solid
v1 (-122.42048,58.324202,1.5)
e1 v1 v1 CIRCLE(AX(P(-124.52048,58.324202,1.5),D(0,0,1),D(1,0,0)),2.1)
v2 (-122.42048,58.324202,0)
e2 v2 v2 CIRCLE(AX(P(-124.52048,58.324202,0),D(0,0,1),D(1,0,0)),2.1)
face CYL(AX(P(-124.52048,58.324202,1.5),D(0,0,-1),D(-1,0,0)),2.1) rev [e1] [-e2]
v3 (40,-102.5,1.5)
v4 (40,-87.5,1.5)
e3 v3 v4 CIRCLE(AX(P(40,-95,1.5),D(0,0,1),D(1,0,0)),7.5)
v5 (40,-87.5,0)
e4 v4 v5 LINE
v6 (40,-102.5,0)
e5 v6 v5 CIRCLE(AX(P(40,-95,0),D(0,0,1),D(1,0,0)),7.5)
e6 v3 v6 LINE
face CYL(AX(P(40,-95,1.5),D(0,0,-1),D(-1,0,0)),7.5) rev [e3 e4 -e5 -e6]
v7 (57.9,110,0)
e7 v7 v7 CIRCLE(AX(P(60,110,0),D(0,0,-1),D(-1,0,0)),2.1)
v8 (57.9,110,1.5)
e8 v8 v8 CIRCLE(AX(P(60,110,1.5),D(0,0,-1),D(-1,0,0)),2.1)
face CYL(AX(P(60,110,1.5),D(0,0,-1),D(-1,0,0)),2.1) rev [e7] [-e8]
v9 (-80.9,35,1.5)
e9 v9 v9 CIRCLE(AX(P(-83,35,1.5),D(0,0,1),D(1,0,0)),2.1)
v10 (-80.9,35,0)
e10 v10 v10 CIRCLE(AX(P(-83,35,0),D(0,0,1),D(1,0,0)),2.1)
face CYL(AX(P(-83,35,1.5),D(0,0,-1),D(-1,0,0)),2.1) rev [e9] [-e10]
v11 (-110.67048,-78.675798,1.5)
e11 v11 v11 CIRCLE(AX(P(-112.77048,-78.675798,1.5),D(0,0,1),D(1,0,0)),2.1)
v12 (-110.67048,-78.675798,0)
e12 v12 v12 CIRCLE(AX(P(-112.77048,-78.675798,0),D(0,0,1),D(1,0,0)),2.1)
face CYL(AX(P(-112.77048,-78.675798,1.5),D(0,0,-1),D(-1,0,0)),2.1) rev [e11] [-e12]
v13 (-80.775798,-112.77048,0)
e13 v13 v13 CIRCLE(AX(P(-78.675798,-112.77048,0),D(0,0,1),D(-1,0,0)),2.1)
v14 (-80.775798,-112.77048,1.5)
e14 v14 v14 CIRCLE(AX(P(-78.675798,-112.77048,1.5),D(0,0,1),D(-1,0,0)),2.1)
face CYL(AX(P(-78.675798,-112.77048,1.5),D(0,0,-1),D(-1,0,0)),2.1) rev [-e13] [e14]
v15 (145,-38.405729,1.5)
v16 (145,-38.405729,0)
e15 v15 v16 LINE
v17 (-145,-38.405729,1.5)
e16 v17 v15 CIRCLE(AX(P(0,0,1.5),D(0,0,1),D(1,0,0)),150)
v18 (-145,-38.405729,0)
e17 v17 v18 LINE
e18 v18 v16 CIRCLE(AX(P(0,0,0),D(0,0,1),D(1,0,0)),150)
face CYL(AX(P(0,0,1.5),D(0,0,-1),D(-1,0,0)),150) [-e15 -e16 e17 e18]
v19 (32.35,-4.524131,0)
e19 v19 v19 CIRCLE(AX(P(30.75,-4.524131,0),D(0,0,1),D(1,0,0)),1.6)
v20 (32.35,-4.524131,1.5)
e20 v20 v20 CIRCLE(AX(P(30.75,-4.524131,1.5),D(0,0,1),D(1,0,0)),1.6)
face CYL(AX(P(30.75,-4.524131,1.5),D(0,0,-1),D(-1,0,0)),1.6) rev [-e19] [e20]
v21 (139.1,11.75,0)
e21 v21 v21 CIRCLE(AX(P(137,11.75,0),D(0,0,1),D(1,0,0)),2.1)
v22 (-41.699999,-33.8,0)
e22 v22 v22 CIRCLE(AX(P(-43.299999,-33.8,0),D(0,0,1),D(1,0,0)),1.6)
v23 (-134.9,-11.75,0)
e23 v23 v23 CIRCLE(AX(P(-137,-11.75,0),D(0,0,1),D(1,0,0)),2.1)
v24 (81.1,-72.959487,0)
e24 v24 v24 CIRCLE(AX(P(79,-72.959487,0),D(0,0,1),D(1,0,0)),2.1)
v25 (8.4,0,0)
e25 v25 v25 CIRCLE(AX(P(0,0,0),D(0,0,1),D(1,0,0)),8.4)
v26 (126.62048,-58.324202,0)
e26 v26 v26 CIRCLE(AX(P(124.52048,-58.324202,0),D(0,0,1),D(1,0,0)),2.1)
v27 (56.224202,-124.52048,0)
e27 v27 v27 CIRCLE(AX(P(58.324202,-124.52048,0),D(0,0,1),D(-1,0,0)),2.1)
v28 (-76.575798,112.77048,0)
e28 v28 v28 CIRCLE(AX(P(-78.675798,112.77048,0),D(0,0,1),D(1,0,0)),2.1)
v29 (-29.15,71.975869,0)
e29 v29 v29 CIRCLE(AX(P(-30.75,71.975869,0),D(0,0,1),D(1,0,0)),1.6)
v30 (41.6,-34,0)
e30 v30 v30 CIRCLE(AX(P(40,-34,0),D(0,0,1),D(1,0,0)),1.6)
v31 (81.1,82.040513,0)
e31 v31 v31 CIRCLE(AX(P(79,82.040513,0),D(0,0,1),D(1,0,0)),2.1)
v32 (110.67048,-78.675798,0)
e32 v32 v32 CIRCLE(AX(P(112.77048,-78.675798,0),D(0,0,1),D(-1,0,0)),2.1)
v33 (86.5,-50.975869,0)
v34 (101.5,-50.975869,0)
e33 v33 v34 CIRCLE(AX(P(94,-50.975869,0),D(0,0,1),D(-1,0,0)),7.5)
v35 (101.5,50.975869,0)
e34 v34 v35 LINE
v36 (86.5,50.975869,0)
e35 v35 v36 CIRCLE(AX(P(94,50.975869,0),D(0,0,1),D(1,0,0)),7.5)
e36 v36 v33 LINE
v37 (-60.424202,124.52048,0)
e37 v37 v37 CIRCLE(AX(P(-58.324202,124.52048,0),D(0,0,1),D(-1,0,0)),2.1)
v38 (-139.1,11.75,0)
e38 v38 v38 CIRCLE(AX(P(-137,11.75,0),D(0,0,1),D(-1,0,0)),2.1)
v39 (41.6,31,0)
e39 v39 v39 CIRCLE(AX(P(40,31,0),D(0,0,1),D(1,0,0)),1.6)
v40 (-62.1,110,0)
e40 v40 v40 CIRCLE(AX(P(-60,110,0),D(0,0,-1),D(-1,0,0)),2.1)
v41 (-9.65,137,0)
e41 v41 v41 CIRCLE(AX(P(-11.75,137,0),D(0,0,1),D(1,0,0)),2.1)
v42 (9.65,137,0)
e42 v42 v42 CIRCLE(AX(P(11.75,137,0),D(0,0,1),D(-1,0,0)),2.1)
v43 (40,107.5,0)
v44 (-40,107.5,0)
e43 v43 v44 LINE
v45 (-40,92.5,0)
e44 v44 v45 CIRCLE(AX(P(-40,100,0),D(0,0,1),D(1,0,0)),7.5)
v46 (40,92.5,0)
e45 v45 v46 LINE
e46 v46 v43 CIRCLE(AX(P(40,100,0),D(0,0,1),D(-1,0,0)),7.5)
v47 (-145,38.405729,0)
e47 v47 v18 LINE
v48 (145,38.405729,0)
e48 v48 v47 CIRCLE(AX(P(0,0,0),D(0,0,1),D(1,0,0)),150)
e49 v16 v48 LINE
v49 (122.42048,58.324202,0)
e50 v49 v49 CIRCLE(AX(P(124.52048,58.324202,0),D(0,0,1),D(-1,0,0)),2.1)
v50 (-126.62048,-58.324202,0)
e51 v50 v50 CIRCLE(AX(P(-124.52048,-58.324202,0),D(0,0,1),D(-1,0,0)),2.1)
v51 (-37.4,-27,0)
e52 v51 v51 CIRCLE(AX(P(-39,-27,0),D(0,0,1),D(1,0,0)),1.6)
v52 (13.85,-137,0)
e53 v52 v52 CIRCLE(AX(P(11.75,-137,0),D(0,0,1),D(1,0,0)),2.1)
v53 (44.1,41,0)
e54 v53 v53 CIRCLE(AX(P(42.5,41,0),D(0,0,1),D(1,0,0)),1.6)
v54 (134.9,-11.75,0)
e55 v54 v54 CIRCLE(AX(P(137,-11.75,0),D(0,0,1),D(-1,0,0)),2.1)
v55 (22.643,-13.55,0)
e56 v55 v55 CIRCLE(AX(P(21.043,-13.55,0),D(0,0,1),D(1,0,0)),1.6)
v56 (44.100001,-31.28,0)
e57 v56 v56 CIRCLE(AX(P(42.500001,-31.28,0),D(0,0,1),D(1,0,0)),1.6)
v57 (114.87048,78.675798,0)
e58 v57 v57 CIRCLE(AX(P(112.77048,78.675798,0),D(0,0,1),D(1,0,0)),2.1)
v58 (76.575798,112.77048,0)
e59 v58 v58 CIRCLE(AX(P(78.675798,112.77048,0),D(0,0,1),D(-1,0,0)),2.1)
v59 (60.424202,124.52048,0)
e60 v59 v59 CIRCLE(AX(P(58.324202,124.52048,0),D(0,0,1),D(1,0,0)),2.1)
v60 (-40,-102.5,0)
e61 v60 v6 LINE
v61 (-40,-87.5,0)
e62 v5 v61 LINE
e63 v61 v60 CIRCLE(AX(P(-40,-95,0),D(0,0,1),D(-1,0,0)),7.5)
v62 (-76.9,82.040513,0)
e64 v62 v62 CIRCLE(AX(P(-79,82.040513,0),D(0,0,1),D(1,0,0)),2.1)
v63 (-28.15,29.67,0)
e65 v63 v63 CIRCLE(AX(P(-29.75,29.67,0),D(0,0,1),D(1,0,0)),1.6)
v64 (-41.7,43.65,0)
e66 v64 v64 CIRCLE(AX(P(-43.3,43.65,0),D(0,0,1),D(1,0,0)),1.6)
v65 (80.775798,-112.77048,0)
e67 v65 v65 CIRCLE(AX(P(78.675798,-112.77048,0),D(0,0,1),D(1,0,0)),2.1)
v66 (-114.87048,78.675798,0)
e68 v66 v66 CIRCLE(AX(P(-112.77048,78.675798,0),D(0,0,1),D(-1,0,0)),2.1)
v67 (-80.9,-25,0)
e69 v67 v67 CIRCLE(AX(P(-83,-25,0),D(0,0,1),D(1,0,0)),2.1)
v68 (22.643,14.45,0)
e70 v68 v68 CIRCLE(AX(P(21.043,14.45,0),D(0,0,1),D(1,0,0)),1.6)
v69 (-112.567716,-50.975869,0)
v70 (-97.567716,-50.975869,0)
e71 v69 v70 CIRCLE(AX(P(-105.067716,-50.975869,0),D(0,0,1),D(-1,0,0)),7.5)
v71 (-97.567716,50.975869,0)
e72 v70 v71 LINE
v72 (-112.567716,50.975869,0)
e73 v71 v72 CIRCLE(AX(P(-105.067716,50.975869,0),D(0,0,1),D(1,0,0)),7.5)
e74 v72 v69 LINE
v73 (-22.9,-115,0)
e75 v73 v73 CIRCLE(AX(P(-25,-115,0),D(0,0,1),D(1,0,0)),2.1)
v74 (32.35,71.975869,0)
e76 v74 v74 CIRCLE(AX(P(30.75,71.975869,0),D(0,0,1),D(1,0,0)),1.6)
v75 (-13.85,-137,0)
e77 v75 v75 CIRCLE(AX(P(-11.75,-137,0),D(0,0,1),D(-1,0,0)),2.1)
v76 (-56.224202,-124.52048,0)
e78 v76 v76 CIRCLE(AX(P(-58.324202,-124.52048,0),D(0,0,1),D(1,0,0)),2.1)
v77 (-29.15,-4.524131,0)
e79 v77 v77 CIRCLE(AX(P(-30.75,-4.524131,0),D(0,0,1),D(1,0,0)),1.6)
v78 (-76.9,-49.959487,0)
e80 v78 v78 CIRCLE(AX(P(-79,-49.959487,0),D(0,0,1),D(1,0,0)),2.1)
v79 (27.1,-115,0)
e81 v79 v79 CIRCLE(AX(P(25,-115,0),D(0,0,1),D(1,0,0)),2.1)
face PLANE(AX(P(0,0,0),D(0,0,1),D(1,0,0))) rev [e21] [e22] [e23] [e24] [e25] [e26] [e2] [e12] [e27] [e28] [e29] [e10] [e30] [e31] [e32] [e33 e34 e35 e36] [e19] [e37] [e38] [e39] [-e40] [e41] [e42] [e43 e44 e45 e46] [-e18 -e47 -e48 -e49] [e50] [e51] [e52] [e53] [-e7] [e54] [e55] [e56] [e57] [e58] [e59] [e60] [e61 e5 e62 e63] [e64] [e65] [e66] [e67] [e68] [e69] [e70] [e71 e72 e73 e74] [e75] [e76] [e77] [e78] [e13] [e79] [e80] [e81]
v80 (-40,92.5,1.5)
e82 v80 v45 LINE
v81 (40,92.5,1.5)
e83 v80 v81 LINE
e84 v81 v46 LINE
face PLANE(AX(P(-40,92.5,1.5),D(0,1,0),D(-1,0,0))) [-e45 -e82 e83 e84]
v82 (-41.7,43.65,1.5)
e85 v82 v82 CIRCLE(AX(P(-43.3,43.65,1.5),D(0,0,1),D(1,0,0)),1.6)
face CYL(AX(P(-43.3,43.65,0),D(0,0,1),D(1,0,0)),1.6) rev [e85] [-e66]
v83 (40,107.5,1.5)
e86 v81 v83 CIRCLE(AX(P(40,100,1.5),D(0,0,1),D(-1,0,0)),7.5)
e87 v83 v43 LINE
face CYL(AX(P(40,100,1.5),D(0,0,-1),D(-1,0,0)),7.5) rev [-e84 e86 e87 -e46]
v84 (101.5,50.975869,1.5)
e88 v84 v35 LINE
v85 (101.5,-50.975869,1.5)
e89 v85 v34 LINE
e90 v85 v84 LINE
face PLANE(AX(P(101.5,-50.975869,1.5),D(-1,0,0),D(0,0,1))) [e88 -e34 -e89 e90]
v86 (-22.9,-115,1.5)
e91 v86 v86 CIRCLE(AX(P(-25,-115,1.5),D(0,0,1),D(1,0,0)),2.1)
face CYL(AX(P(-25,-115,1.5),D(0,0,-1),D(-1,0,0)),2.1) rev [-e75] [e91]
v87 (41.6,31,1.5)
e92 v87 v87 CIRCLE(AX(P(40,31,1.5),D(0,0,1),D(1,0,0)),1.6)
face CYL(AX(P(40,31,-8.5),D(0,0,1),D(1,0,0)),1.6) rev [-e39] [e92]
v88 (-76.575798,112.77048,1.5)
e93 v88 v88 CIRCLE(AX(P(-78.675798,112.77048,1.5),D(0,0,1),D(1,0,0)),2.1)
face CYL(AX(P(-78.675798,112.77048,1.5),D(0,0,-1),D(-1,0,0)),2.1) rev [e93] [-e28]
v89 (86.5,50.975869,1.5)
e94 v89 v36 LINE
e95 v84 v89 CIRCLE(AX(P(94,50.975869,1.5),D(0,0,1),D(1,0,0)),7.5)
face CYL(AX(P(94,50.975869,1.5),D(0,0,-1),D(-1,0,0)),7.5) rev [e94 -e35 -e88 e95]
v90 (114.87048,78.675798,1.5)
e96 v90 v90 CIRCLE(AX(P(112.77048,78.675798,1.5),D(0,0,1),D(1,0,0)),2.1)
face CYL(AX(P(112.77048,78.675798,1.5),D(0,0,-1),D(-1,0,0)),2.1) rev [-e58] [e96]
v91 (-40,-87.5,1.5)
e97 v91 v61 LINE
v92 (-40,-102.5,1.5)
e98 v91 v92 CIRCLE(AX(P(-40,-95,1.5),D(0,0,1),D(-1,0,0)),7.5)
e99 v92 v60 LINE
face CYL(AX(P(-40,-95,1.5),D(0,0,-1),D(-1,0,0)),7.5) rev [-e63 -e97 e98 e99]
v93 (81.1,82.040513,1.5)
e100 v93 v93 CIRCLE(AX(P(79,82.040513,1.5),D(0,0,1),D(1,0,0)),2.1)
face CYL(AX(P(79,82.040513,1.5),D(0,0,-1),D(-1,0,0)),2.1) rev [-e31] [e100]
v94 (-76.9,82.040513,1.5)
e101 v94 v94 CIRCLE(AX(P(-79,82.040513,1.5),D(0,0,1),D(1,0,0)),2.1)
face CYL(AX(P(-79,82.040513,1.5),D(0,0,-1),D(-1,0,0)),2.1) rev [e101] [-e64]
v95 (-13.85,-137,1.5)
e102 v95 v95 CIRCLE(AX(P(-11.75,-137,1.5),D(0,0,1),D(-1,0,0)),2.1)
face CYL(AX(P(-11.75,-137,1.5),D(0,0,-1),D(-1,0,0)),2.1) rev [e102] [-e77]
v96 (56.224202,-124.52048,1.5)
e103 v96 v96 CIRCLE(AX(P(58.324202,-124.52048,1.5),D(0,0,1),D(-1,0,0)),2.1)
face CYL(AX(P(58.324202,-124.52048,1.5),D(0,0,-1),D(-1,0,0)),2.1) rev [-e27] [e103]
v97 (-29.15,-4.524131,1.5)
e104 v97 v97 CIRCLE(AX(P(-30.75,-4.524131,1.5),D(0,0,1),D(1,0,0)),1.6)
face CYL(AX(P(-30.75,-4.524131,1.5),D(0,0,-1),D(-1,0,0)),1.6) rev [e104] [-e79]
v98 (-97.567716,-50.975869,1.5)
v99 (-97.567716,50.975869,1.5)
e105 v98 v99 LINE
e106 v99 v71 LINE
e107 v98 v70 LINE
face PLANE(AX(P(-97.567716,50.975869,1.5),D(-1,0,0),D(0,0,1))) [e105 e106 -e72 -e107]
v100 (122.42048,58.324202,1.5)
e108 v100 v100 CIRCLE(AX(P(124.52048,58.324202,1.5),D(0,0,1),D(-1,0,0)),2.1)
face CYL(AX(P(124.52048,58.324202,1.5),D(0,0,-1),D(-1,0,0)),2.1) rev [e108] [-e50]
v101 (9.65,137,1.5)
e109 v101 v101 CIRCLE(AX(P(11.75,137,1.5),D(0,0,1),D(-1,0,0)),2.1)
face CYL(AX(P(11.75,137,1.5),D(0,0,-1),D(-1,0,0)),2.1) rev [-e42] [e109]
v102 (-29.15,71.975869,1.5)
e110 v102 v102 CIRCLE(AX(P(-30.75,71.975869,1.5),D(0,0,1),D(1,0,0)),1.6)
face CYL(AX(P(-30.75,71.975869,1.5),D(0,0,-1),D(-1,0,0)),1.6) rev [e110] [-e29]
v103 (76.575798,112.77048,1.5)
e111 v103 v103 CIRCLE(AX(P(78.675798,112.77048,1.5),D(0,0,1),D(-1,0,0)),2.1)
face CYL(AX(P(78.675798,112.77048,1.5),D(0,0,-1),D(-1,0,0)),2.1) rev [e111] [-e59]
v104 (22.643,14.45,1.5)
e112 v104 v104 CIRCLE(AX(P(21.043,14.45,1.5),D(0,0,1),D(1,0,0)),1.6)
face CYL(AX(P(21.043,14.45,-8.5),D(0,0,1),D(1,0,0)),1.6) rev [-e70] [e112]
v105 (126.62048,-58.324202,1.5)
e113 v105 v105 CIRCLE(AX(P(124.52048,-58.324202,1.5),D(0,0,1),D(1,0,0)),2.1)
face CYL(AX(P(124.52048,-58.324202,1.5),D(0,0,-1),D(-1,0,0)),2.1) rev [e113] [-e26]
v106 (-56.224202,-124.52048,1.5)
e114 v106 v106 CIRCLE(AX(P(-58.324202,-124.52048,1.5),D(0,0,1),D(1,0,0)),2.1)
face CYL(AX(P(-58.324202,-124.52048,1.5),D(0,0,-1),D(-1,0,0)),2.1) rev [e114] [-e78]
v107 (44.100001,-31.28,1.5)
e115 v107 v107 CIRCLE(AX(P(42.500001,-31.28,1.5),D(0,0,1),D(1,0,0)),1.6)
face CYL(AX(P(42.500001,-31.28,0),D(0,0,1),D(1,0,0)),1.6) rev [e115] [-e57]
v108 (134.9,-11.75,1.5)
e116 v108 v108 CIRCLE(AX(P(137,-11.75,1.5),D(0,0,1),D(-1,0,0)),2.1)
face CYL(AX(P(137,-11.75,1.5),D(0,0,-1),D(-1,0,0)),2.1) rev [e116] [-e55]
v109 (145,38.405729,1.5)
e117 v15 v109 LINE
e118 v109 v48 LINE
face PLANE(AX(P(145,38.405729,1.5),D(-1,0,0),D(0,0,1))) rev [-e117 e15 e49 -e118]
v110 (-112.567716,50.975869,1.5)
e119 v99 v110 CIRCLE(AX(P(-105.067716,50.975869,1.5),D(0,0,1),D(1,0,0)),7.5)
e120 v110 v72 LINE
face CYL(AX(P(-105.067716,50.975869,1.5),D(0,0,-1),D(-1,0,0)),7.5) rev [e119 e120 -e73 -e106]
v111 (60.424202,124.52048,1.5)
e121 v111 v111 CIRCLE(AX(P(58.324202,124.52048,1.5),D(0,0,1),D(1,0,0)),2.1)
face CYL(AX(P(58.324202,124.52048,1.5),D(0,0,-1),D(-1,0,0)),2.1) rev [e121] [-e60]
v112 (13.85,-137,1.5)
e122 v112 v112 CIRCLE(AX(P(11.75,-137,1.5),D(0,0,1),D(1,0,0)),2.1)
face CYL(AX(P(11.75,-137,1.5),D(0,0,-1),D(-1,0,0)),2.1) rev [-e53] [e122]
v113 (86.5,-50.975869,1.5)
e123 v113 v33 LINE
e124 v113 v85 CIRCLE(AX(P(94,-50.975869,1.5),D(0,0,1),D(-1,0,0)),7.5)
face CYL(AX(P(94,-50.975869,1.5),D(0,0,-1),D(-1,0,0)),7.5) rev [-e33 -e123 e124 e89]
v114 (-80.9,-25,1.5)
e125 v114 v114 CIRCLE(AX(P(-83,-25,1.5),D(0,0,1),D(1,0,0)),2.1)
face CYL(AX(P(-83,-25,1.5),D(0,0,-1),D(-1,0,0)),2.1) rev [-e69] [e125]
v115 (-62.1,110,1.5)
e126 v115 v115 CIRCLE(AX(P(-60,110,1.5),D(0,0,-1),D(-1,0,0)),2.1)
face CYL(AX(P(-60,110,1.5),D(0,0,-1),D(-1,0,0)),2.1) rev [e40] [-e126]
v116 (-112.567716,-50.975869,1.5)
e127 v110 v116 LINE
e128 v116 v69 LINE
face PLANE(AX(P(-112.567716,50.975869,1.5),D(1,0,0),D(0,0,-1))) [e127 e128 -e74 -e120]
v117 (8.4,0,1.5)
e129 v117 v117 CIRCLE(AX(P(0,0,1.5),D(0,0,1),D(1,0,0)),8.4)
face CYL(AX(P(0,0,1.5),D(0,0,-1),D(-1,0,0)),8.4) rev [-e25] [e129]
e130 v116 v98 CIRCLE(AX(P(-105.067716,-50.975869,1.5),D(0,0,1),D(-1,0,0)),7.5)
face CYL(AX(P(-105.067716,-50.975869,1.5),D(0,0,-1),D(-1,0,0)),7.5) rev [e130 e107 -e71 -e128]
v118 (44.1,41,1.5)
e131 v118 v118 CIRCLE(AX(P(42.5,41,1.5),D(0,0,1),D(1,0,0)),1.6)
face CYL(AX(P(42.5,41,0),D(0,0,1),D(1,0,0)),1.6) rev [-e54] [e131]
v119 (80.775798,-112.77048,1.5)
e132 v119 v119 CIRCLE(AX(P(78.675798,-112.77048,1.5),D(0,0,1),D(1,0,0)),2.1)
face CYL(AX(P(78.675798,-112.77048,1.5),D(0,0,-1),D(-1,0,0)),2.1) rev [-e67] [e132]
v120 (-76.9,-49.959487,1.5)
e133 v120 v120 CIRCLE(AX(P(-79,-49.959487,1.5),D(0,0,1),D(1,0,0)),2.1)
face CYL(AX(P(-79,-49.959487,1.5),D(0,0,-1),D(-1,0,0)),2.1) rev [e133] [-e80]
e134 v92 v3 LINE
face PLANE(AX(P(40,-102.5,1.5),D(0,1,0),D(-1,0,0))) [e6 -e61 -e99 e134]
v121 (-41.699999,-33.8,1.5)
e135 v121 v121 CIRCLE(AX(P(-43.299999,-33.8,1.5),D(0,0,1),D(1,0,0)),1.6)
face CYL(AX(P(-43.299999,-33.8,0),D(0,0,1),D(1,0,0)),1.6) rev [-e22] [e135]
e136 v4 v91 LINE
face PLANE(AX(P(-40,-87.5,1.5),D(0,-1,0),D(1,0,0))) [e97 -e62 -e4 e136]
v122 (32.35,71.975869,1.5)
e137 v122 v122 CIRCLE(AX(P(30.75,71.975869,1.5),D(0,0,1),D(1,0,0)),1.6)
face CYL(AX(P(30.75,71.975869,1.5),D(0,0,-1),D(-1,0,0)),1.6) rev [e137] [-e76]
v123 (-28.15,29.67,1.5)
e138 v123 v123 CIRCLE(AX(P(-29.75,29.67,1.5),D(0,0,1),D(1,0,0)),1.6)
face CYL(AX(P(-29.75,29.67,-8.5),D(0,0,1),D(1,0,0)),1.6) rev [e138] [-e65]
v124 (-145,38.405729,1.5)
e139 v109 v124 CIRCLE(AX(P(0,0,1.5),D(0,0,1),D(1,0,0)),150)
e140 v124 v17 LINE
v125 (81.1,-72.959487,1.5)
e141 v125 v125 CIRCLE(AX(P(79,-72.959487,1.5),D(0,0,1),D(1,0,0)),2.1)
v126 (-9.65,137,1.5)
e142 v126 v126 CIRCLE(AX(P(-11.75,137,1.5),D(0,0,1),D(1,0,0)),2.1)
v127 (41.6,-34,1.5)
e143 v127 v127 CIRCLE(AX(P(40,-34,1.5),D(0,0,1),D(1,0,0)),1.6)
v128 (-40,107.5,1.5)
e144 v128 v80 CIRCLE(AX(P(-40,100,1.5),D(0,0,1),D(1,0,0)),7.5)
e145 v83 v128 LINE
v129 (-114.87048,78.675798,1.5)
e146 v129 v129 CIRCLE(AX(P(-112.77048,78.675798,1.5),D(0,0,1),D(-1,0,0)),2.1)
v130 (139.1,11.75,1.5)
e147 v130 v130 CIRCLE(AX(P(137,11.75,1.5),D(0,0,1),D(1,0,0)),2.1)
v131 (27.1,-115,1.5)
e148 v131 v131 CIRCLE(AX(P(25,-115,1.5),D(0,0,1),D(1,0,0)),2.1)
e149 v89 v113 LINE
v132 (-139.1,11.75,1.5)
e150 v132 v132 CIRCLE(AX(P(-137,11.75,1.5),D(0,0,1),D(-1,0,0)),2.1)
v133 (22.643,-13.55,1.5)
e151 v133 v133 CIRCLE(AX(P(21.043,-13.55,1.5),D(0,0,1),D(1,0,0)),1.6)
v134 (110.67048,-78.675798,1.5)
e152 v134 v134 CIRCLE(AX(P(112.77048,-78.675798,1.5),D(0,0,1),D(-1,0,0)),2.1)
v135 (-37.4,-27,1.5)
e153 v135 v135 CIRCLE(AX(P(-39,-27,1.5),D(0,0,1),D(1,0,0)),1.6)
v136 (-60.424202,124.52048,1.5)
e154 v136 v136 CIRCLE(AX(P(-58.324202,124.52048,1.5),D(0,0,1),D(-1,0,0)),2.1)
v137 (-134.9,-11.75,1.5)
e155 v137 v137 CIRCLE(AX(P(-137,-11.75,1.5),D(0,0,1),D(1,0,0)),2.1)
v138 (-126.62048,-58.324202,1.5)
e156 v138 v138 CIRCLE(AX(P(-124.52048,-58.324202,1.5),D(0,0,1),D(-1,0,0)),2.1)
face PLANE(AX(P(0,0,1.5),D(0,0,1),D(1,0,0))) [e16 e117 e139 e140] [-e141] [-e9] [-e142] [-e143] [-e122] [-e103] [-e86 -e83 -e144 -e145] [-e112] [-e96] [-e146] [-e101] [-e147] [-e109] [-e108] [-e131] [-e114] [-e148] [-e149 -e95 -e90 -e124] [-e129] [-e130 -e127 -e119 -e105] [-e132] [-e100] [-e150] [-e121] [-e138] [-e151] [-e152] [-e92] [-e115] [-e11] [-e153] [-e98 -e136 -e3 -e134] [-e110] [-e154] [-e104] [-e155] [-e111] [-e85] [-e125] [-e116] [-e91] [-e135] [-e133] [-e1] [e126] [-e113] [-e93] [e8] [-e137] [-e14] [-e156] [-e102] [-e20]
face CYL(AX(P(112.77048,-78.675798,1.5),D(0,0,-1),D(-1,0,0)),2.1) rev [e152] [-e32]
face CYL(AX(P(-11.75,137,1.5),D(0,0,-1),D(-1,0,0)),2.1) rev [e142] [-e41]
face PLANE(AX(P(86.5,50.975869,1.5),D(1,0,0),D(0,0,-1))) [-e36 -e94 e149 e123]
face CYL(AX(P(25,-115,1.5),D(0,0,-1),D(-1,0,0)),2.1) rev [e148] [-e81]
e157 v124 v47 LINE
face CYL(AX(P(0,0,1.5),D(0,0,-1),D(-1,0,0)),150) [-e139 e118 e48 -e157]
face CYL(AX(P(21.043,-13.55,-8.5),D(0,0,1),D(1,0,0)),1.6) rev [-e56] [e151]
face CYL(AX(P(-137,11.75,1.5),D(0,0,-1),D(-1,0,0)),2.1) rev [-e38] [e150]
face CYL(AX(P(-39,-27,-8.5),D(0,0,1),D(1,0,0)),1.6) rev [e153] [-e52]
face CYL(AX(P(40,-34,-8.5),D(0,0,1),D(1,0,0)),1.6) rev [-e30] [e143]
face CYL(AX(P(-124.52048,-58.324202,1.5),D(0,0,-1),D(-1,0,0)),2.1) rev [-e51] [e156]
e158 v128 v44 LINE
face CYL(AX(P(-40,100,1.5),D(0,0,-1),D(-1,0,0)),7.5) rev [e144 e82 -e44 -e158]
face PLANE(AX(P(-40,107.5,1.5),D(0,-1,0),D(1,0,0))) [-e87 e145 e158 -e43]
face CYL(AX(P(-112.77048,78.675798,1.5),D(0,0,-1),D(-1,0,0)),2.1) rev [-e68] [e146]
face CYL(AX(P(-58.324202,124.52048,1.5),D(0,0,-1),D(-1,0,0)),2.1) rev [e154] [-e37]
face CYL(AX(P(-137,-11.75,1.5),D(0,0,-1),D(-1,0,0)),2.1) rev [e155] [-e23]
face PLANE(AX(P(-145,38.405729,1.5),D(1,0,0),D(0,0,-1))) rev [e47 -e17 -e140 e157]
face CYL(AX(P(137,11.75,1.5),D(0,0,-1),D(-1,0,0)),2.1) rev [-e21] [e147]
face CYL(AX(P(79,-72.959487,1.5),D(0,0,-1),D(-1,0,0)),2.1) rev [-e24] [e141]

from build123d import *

# Parameters (mm, degrees)
SM_BASE_FLANGE_1_OUTLINE_R   = 2.1
SM_BASE_FLANGE_1_OUTLINE_R_2 = 1.6
SM_BASE_FLANGE_1_OUTLINE_R_3 = 8.4
SM_BASE_FLANGE_1_DEPTH       = 1.5
SKETCH_2_R                   = 1.6
CUT_EXTRUDE_1_DEPTH          = 10
SKETCH_4_R                   = 2.1
CUT_EXTRUDE_2_DEPTH          = 1.5
SKETCH_6_R                   = 1.6
CUT_EXTRUDE_4_DEPTH          = 1.5


# Read off the part's stored shape, not the designer's step: 基体-法兰1
with BuildPart() as part:
    # 基体-法兰1 outline → 基体-法兰1 (new body)
    with BuildSketch(Plane.XY):
        with BuildLine():
            ThreePointArc((-145, -38.405728739), (0, -150), (145, -38.405728739))
            Line((145, -38.405728739), (145, 38.405728739))
            ThreePointArc((145, 38.405728739), (0, 150), (-145, 38.405728739))
            Line((-145, 38.405728739), (-145, -38.405728739))
        make_face()
        with Locations((-78.675798494, -112.770480318)):
            Circle(SM_BASE_FLANGE_1_OUTLINE_R, mode=Mode.SUBTRACT)
        with Locations((-112.770480318, -78.675798494)):
            Circle(SM_BASE_FLANGE_1_OUTLINE_R, mode=Mode.SUBTRACT)
        with Locations((-58.324201506, -124.520480318)):
            Circle(SM_BASE_FLANGE_1_OUTLINE_R, mode=Mode.SUBTRACT)
        with Locations((-11.75, -137)):
            Circle(SM_BASE_FLANGE_1_OUTLINE_R, mode=Mode.SUBTRACT)
        with Locations((-25, -115)):
            Circle(SM_BASE_FLANGE_1_OUTLINE_R, mode=Mode.SUBTRACT)
        with Locations((-124.520480318, -58.324201506)):
            Circle(SM_BASE_FLANGE_1_OUTLINE_R, mode=Mode.SUBTRACT)
        with Locations((-79, -49.959487412)):
            Circle(SM_BASE_FLANGE_1_OUTLINE_R, mode=Mode.SUBTRACT)
        with Locations((-137, -11.75)):
            Circle(SM_BASE_FLANGE_1_OUTLINE_R, mode=Mode.SUBTRACT)
        with Locations((-83, -25)):
            Circle(SM_BASE_FLANGE_1_OUTLINE_R, mode=Mode.SUBTRACT)
        with Locations((-30.75, -4.524131076)):
            Circle(SM_BASE_FLANGE_1_OUTLINE_R_2, mode=Mode.SUBTRACT)
        with Locations((11.75, -137)):
            Circle(SM_BASE_FLANGE_1_OUTLINE_R, mode=Mode.SUBTRACT)
        with Locations((25, -115)):
            Circle(SM_BASE_FLANGE_1_OUTLINE_R, mode=Mode.SUBTRACT)
        with Locations((58.324201506, -124.520480318)):
            Circle(SM_BASE_FLANGE_1_OUTLINE_R, mode=Mode.SUBTRACT)
        with BuildLine():
            Line((40, -102.5), (-40, -102.5))
            ThreePointArc((-40, -102.5), (-47.5, -95), (-40, -87.5))
            Line((-40, -87.5), (40, -87.5))
            ThreePointArc((40, -87.5), (47.5, -95), (40, -102.5))
        make_face(mode=Mode.SUBTRACT)
        with Locations((78.675798494, -112.770480318)):
            Circle(SM_BASE_FLANGE_1_OUTLINE_R, mode=Mode.SUBTRACT)
        with Locations((112.770480318, -78.675798494)):
            Circle(SM_BASE_FLANGE_1_OUTLINE_R, mode=Mode.SUBTRACT)
        with Locations((30.75, -4.524131076)):
            Circle(SM_BASE_FLANGE_1_OUTLINE_R_2, mode=Mode.SUBTRACT)
        with Locations((79, -72.959487412)):
            Circle(SM_BASE_FLANGE_1_OUTLINE_R, mode=Mode.SUBTRACT)
        with Locations((124.520480318, -58.324201506)):
            Circle(SM_BASE_FLANGE_1_OUTLINE_R, mode=Mode.SUBTRACT)
        with Locations((137, -11.75)):
            Circle(SM_BASE_FLANGE_1_OUTLINE_R, mode=Mode.SUBTRACT)
        with Locations((-137, 11.75)):
            Circle(SM_BASE_FLANGE_1_OUTLINE_R, mode=Mode.SUBTRACT)
        with BuildLine():
            Line((-112.567715637, -50.975868924), (-112.567715637, 50.975868924))
            ThreePointArc((-112.567715637, 50.975868924), (-105.067715637, 58.475868924), (-97.567715637, 50.975868924))
            Line((-97.567715637, 50.975868924), (-97.567715637, -50.975868924))
            ThreePointArc((-97.567715637, -50.975868924), (-105.067715637, -58.475868924), (-112.567715637, -50.975868924))
        make_face(mode=Mode.SUBTRACT)
        with Locations((-83, 35)):
            Circle(SM_BASE_FLANGE_1_OUTLINE_R, mode=Mode.SUBTRACT)
        with Locations((-124.520480318, 58.324201506)):
            Circle(SM_BASE_FLANGE_1_OUTLINE_R, mode=Mode.SUBTRACT)
        with Locations((-30.75, 71.975868924)):
            Circle(SM_BASE_FLANGE_1_OUTLINE_R_2, mode=Mode.SUBTRACT)
        with Locations((-112.770480318, 78.675798494)):
            Circle(SM_BASE_FLANGE_1_OUTLINE_R, mode=Mode.SUBTRACT)
        with Locations((-79, 82.040512588)):
            Circle(SM_BASE_FLANGE_1_OUTLINE_R, mode=Mode.SUBTRACT)
        with Locations((-78.675798494, 112.770480318)):
            Circle(SM_BASE_FLANGE_1_OUTLINE_R, mode=Mode.SUBTRACT)
        with Locations((-58.324201506, 124.520480318)):
            Circle(SM_BASE_FLANGE_1_OUTLINE_R, mode=Mode.SUBTRACT)
        with Locations((-11.75, 137)):
            Circle(SM_BASE_FLANGE_1_OUTLINE_R, mode=Mode.SUBTRACT)
        Circle(SM_BASE_FLANGE_1_OUTLINE_R_3, mode=Mode.SUBTRACT)
        with Locations((30.75, 71.975868924)):
            Circle(SM_BASE_FLANGE_1_OUTLINE_R_2, mode=Mode.SUBTRACT)
        with BuildLine():
            Line((86.5, -50.975868924), (86.5, 50.975868924))
            ThreePointArc((86.5, 50.975868924), (94, 58.475868924), (101.5, 50.975868924))
            Line((101.5, 50.975868924), (101.5, -50.975868924))
            ThreePointArc((101.5, -50.975868924), (94, -58.475868924), (86.5, -50.975868924))
        make_face(mode=Mode.SUBTRACT)
        with Locations((137, 11.75)):
            Circle(SM_BASE_FLANGE_1_OUTLINE_R, mode=Mode.SUBTRACT)
        with Locations((124.520480318, 58.324201506)):
            Circle(SM_BASE_FLANGE_1_OUTLINE_R, mode=Mode.SUBTRACT)
        with BuildLine():
            Line((40, 92.5), (-40, 92.5))
            ThreePointArc((-40, 92.5), (-47.5, 100), (-40, 107.5))
            Line((-40, 107.5), (40, 107.5))
            ThreePointArc((40, 107.5), (47.5, 100), (40, 92.5))
        make_face(mode=Mode.SUBTRACT)
        with Locations((11.75, 137)):
            Circle(SM_BASE_FLANGE_1_OUTLINE_R, mode=Mode.SUBTRACT)
        with Locations((58.324201506, 124.520480318)):
            Circle(SM_BASE_FLANGE_1_OUTLINE_R, mode=Mode.SUBTRACT)
        with Locations((79, 82.040512588)):
            Circle(SM_BASE_FLANGE_1_OUTLINE_R, mode=Mode.SUBTRACT)
        with Locations((112.770480318, 78.675798494)):
            Circle(SM_BASE_FLANGE_1_OUTLINE_R, mode=Mode.SUBTRACT)
        with Locations((78.675798494, 112.770480318)):
            Circle(SM_BASE_FLANGE_1_OUTLINE_R, mode=Mode.SUBTRACT)
    extrude(amount=SM_BASE_FLANGE_1_DEPTH)

    # 草图2 → 切除-拉伸1 (cut)
    with BuildSketch(Plane.XY.offset(1.5)):
        with Locations((40, -34)):
            Circle(SKETCH_2_R)
        with Locations((40, 31)):
            Circle(SKETCH_2_R)
        with Locations((21.043, -13.55)):
            Circle(SKETCH_2_R)
        with Locations((-39, -27)):
            Circle(SKETCH_2_R)
        with Locations((-29.75, 29.67)):
            Circle(SKETCH_2_R)
        with Locations((21.043, 14.45)):
            Circle(SKETCH_2_R)
    extrude(amount=-CUT_EXTRUDE_1_DEPTH, mode=Mode.SUBTRACT)

    # 草图4 → 切除-拉伸2 (cut)
    with BuildSketch(Plane(origin=(0, 0, 0), x_dir=(-1, 0, 0), z_dir=(0, 0, -1))):
        with Locations((-60, 110)):
            Circle(SKETCH_4_R)
        with Locations((60, 110)):
            Circle(SKETCH_4_R)
    extrude(amount=-CUT_EXTRUDE_2_DEPTH, mode=Mode.SUBTRACT)

    # 草图6 → 切除-拉伸4 (cut)
    with BuildSketch(Plane.XY.offset(1.5)):
        with Locations((42.500000131, 41)):
            Circle(SKETCH_6_R)
        with Locations((42.500001181, -31.28)):
            Circle(SKETCH_6_R)
        with Locations((-43.299998782, -33.8)):
            Circle(SKETCH_6_R)
        with Locations((-43.299999908, 43.65)):
            Circle(SKETCH_6_R)
    extrude(amount=-CUT_EXTRUDE_4_DEPTH, mode=Mode.SUBTRACT)


solid = part.part
